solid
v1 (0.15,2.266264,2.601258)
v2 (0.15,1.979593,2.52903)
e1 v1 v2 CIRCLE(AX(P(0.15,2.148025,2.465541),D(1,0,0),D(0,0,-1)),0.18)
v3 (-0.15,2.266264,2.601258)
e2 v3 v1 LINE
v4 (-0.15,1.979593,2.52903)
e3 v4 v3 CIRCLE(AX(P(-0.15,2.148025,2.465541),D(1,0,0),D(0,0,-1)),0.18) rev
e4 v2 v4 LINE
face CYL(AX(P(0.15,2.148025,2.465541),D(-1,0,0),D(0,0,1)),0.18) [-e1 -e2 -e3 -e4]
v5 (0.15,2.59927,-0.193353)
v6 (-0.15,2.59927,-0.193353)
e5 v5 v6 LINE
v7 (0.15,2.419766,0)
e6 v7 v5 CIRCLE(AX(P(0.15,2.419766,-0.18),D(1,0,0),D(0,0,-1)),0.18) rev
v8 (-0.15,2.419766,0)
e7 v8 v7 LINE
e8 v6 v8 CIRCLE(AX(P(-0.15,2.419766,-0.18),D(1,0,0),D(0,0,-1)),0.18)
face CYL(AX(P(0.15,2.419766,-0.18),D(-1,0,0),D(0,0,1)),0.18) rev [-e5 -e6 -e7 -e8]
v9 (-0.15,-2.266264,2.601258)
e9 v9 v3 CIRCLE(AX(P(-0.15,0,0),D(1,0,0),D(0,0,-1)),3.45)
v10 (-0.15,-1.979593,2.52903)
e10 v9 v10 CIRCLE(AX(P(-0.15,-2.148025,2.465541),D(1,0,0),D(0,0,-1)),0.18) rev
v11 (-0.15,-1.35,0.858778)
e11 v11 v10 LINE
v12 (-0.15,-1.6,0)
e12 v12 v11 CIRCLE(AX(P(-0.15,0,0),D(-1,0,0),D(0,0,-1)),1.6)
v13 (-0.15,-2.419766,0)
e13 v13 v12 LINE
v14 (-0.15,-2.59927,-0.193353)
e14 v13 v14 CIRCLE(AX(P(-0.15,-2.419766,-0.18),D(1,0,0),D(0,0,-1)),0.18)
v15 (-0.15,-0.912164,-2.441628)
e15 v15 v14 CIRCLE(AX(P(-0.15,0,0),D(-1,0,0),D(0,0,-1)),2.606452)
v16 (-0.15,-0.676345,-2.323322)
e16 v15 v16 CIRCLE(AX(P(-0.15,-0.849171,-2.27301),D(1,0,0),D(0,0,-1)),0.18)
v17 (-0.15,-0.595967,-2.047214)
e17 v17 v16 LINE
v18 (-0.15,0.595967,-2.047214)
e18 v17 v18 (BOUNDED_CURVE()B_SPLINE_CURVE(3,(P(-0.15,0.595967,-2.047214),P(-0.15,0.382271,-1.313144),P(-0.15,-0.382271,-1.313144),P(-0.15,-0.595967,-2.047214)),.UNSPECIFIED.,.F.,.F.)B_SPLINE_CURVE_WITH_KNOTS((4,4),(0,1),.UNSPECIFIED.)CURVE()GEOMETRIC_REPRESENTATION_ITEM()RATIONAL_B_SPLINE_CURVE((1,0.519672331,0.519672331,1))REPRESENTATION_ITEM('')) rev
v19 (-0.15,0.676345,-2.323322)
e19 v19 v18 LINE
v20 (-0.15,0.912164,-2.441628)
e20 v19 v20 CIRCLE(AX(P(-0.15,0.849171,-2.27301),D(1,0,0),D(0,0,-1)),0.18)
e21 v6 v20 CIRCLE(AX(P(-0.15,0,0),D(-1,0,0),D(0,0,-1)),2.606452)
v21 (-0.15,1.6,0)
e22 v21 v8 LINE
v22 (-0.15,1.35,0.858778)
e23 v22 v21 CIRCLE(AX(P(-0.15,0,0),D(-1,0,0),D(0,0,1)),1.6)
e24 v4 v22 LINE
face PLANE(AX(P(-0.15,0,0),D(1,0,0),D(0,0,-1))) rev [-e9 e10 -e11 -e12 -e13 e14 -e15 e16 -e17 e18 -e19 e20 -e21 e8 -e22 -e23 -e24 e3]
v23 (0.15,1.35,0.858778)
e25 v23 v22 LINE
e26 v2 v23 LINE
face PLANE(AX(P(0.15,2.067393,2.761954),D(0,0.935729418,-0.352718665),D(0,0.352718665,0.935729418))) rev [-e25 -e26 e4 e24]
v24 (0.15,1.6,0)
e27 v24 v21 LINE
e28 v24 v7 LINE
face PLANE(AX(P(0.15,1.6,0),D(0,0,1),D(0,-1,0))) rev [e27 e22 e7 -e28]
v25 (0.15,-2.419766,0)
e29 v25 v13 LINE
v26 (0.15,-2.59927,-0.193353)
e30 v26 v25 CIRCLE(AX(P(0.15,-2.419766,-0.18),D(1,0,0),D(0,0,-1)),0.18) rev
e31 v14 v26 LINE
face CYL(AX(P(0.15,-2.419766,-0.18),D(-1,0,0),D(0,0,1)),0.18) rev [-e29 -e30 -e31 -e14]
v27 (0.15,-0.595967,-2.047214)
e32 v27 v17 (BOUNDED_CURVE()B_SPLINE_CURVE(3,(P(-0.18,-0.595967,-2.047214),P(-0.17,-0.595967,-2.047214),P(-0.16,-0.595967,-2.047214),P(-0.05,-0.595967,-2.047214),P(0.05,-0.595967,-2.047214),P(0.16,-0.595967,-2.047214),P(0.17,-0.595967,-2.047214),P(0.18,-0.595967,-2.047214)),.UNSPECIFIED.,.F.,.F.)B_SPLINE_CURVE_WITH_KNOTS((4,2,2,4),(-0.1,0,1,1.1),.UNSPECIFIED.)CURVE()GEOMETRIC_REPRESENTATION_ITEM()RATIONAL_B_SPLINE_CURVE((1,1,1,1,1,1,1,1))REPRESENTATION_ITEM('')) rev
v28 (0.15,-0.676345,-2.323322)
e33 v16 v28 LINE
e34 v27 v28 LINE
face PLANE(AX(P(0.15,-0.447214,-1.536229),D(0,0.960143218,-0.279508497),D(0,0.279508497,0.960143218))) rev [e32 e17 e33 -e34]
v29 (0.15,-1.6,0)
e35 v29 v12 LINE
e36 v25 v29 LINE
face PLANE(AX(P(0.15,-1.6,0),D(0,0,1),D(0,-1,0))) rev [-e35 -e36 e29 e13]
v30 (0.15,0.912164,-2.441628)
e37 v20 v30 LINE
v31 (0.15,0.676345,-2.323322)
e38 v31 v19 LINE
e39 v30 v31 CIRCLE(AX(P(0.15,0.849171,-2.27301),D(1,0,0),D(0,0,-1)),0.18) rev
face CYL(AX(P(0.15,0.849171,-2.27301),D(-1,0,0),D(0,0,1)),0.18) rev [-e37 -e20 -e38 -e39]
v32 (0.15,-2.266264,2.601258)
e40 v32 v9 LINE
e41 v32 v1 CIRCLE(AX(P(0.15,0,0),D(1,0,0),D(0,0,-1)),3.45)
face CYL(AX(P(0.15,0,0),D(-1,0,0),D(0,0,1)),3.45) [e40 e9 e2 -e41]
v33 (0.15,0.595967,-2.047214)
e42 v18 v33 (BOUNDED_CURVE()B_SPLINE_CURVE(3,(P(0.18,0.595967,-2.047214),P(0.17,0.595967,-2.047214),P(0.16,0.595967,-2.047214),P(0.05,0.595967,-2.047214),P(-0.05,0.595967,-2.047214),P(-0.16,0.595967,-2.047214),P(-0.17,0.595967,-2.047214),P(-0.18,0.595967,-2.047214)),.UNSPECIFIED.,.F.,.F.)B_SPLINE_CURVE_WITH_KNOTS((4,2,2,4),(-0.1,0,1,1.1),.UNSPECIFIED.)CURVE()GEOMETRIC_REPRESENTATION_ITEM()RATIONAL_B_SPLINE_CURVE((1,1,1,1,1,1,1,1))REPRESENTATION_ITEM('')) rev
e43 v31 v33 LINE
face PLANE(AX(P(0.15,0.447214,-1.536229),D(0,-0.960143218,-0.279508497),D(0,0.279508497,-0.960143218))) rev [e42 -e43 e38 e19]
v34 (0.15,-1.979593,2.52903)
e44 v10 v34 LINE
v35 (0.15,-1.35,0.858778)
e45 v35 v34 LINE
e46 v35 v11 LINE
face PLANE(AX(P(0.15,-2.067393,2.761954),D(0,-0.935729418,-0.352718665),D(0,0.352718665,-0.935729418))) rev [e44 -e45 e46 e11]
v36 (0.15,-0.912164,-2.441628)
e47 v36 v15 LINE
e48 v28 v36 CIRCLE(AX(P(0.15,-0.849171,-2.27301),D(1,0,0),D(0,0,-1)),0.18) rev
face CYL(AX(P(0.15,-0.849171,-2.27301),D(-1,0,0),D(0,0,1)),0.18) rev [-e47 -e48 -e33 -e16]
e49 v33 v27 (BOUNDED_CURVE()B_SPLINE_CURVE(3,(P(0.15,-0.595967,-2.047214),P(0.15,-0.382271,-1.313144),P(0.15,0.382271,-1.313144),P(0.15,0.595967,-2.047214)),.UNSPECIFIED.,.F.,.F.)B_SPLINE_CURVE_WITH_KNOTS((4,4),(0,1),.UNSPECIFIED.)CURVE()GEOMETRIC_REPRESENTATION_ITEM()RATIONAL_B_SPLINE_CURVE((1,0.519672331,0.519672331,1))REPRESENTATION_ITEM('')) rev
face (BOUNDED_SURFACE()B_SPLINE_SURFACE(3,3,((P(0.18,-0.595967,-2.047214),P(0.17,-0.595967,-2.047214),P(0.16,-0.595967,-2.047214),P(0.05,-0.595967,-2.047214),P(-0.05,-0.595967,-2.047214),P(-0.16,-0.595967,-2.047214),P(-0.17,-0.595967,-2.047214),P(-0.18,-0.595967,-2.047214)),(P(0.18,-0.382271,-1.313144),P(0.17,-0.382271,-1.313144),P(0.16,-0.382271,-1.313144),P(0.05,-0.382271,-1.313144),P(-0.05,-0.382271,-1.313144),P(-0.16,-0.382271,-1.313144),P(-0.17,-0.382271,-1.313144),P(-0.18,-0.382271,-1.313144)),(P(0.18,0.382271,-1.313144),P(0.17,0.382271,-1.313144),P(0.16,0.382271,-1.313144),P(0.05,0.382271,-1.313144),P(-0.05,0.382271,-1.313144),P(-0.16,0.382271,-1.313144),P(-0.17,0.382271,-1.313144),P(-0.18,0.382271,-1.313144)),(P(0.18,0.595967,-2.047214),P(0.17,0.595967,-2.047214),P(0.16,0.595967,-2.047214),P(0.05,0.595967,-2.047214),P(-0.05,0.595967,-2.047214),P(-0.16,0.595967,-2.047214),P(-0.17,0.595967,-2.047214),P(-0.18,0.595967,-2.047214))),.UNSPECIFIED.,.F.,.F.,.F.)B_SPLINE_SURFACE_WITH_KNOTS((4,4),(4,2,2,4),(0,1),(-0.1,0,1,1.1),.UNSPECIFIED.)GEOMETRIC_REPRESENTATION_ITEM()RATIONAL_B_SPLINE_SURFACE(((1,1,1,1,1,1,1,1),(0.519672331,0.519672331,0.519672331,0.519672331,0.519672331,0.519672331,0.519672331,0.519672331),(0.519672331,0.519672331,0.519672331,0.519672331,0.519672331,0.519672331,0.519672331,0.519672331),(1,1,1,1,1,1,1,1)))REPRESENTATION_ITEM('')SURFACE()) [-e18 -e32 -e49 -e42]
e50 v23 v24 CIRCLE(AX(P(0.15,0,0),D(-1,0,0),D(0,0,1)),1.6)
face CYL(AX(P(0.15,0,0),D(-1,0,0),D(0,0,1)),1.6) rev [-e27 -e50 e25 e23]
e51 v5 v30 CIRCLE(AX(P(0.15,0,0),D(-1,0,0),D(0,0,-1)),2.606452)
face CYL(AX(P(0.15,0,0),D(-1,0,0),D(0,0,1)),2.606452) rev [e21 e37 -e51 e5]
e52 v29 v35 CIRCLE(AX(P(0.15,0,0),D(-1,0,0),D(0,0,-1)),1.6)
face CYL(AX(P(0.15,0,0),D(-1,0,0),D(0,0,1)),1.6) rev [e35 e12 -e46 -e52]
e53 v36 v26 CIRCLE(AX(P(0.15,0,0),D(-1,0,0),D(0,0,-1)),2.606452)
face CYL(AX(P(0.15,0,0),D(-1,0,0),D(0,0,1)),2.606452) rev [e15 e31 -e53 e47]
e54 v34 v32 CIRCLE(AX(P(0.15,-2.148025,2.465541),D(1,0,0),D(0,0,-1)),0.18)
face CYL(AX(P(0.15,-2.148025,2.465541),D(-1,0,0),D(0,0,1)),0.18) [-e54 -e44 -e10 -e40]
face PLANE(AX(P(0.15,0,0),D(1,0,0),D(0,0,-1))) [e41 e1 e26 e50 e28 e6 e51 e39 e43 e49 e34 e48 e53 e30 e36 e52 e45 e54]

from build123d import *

# Parameters (mm, degrees)
EXTRUDE1_DEPTH = 0.15
FILLET1_R      = 0.18
FILLET2_START  = -1
FILLET2_DEPTH  = 2


with BuildPart() as part:
    # Sketch1 → Extrude1 (new, symmetric)
    with BuildSketch(Plane(origin=(0, 0, 0), x_dir=(0, 0, -1), z_dir=(1, 0, 0))):
        with BuildLine():
            Line((-2.761953542, -2.067392713), (-0.858778202, -1.35))
            ThreePointArc((-0.858778202, -1.35), (-0.447213595, -1.53622915), (0, -1.6))
            Line((0, -1.6), (0, -2.606451613))
            ThreePointArc((0, -2.606451613), (1.564404659, -2.084760915), (2.50256684, -0.728525373))
            Line((2.50256684, -0.728525373), (1.53622915, -0.447213595))
            ThreePointArc((1.53622915, -0.447213595), (1.6, 0), (1.53622915, 0.447213595))
            Line((1.53622915, 0.447213595), (2.50256684, 0.728525373))
            ThreePointArc((2.50256684, 0.728525373), (1.564404659, 2.084760915), (0, 2.606451613))
            Line((0, 2.606451613), (0, 1.6))
            ThreePointArc((0, 1.6), (-0.447213595, 1.53622915), (-0.858778202, 1.35))
            Line((-0.858778202, 1.35), (-2.761953542, 2.067392713))
            ThreePointArc((-2.761953542, 2.067392713), (3.45, 0), (-2.761953542, -2.067392713))
        make_face()
    extrude(amount=EXTRUDE1_DEPTH, both=True)

    # Fillet1
    fillet1_edges = [part.edges().sort_by_distance(p)[0] for p in [
        (0, -2.067392713, 2.761953542),
        (0, -2.606451613, 0),
        (0, -0.728525373, -2.50256684),
        (0, 0.728525373, -2.50256684),
        (0, 2.606451613, 0),
        (0, 2.067392713, 2.761953542),
    ]]
    fillet(fillet1_edges, radius=FILLET1_R)

    # Fillet2: read off the stored shape, not the designer's step
    # Fillet2 outline → Fillet2 (cut)
    with BuildSketch(Plane.YZ.offset(FILLET2_START)):
        with BuildLine():
            Line((-0.447213595, -1.53622915), (-0.595966919, -2.047213595))
            add(Edge.make_bspline(
                [(-0.595966919, -2.047213595), (-0.522890719, -1.796188606), (-0.310518672, -1.6), (0, -1.6)],
                knots=[0, 0, 0, 0, 0.5, 0.5, 0.5, 0.5], degree=3, weights=[1, 0.759836166, 0.639754249, 0.639754249]))
            ThreePointArc((0, -1.6), (-0.225868723, -1.583977058), (-0.447213595, -1.53622915))
        make_face()
        with BuildLine():
            ThreePointArc((0.447213595, -1.53622915), (0.225868723, -1.583977058), (0, -1.6))
            add(Edge.make_bspline(
                [(0, -1.6), (0.310518672, -1.6), (0.522890719, -1.796188606), (0.595966919, -2.047213595)],
                knots=[0.5, 0.5, 0.5, 0.5, 1, 1, 1, 1], degree=3, weights=[0.639754249, 0.639754249, 0.759836166, 1]))
            Line((0.595966919, -2.047213595), (0.447213595, -1.53622915))
        make_face()
    extrude(amount=FILLET2_DEPTH, mode=Mode.SUBTRACT)


solid = part.part
